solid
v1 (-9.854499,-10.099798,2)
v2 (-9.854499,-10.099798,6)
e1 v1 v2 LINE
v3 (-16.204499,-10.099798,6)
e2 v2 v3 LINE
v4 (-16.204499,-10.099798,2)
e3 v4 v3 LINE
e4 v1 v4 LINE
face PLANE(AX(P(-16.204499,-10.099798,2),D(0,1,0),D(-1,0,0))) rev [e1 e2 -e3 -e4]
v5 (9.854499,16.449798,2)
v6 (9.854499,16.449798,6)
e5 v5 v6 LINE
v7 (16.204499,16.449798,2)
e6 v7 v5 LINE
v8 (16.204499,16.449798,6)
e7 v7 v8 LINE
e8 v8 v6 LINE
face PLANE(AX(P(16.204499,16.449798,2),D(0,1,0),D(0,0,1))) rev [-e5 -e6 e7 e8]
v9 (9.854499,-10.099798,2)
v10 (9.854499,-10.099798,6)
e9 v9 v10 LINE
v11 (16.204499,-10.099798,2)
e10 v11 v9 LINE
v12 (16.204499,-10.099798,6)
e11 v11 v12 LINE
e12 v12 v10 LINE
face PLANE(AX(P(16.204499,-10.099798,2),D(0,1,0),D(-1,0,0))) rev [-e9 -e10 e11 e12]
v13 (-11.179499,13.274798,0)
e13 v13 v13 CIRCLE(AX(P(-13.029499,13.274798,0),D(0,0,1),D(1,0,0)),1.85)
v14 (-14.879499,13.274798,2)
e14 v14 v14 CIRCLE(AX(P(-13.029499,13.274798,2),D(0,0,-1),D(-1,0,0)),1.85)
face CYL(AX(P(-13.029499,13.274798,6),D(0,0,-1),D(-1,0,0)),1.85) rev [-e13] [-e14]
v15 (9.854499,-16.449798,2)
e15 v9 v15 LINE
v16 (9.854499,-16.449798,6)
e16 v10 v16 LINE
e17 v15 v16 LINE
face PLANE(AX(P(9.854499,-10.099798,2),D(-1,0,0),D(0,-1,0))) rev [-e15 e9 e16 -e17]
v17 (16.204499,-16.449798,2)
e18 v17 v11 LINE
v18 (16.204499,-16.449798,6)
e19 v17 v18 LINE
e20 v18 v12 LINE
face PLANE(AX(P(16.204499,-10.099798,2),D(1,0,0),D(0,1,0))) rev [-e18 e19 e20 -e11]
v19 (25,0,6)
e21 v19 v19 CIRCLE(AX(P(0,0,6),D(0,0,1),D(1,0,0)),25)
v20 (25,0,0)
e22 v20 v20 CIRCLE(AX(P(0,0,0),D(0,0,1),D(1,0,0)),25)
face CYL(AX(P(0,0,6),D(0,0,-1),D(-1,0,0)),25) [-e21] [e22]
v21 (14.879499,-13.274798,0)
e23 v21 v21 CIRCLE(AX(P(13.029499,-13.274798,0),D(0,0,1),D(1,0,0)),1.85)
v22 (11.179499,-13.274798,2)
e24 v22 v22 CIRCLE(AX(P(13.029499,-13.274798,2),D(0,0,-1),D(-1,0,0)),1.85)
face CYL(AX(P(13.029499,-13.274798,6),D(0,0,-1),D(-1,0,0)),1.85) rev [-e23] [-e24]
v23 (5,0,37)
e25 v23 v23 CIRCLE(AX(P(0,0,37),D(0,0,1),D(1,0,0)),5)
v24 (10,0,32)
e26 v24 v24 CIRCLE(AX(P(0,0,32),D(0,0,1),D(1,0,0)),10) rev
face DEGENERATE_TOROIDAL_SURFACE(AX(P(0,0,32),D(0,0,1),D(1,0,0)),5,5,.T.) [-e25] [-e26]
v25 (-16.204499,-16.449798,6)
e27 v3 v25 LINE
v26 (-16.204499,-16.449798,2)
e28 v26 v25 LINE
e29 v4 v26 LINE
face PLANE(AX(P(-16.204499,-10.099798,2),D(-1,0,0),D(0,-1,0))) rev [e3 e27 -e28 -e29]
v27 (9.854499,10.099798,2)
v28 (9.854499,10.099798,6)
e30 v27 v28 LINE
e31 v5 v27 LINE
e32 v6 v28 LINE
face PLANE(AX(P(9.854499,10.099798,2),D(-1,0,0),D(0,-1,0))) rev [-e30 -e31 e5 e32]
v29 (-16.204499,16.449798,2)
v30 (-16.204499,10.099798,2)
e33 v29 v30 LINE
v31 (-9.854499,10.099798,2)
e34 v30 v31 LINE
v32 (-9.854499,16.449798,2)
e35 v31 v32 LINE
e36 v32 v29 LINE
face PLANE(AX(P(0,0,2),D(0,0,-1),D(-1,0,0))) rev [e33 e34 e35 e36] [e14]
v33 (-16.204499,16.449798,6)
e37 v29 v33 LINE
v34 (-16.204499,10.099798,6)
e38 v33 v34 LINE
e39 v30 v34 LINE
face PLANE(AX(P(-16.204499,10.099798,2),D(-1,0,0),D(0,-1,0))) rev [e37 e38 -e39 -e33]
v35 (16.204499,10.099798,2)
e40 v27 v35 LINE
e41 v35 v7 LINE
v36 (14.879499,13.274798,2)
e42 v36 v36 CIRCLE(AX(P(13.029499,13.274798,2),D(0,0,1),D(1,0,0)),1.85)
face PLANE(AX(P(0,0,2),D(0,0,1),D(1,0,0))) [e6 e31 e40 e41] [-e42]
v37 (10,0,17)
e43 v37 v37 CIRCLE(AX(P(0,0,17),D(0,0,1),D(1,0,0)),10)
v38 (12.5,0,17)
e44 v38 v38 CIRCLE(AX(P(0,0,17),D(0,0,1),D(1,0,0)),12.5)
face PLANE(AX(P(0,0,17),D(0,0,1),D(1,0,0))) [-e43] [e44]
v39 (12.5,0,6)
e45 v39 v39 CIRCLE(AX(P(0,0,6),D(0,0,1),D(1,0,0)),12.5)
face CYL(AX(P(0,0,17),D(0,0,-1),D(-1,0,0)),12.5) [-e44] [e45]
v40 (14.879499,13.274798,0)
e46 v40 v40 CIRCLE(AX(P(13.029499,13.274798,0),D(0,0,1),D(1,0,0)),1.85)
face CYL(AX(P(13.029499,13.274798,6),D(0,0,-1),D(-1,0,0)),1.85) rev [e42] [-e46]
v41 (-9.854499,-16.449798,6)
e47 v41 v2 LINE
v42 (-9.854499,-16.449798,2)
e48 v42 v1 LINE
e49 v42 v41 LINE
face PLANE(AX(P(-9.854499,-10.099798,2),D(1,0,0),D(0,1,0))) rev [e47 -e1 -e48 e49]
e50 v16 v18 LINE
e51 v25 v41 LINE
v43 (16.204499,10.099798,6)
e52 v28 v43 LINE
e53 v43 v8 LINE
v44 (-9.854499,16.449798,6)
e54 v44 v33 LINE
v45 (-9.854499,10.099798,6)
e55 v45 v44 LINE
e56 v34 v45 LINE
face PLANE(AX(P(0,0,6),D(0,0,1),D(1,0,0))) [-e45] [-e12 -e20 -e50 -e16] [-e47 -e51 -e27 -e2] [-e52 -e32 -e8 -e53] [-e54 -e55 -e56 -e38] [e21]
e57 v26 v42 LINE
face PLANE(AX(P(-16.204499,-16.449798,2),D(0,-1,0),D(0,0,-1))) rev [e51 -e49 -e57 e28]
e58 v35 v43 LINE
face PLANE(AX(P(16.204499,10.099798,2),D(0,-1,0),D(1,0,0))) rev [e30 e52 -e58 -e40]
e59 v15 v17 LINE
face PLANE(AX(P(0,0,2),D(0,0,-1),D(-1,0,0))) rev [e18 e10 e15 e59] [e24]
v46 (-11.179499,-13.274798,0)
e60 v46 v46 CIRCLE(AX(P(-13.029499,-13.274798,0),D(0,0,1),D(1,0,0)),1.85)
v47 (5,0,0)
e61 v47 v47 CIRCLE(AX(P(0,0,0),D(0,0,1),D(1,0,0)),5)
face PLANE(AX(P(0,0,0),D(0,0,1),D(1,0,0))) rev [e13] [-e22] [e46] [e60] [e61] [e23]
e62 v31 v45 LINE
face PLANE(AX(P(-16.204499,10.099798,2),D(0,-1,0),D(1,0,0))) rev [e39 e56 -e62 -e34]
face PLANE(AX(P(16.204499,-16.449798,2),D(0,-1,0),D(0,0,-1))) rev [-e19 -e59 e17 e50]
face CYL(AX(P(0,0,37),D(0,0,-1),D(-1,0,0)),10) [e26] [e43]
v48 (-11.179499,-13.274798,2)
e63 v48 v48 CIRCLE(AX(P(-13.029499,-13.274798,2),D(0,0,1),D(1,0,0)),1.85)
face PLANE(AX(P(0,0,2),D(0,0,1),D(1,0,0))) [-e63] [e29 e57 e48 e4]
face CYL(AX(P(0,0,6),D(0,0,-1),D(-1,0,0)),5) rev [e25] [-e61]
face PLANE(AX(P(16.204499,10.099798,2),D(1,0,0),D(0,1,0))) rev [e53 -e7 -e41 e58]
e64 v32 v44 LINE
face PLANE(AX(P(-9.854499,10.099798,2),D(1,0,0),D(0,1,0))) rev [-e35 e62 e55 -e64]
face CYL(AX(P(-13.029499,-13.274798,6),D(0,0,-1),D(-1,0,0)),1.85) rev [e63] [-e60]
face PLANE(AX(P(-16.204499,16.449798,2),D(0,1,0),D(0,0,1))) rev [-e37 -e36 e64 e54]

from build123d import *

# Parameters (mm, degrees)
SKETCH1_R           = 25
SKETCH1_R_2         = 1.85
SKETCH1_R_3         = 5
BOSS_EXTRUDE1_DEPTH = 6
SKETCH2_R           = 12.5
SKETCH2_R_2         = 5
BOSS_EXTRUDE2_DEPTH = 11
SKETCH3_R           = 10
SKETCH3_R_2         = 5
BOSS_EXTRUDE3_DEPTH = 20
FILLET1_R           = 5
SKETCH4_W           = 6.35
SKETCH4_H           = 6.35
CUT_EXTRUDE1_DEPTH  = 4


with BuildPart() as part:
    # Sketch1 → Boss-Extrude1 (new body)
    with BuildSketch(Plane.XY):
        Circle(SKETCH1_R)
        with Locations((-13.029498672, -13.274798425)):
            Circle(SKETCH1_R_2, mode=Mode.SUBTRACT)
        with Locations((13.029498672, -13.274798425)):
            Circle(SKETCH1_R_2, mode=Mode.SUBTRACT)
        with Locations((13.029498672, 13.274798425)):
            Circle(SKETCH1_R_2, mode=Mode.SUBTRACT)
        with Locations((-13.029498672, 13.274798425)):
            Circle(SKETCH1_R_2, mode=Mode.SUBTRACT)
        Circle(SKETCH1_R_3, mode=Mode.SUBTRACT)
    extrude(amount=BOSS_EXTRUDE1_DEPTH)

    # Sketch2 → Boss-Extrude2 (add)
    with BuildSketch(Plane.XY.offset(6)):
        Circle(SKETCH2_R)
        Circle(SKETCH2_R_2, mode=Mode.SUBTRACT)
    extrude(amount=BOSS_EXTRUDE2_DEPTH)

    # Sketch3 → Boss-Extrude3 (add)
    with BuildSketch(Plane.XY.offset(17)):
        Circle(SKETCH3_R)
        Circle(SKETCH3_R_2, mode=Mode.SUBTRACT)
    extrude(amount=BOSS_EXTRUDE3_DEPTH)

    # Fillet1
    fillet1_edges = [part.edges().sort_by_distance(p)[0] for p in [
        (-10, 0, 37),
    ]]
    fillet(fillet1_edges, radius=FILLET1_R - 0.0001)  # a hair under: the kernel refuses the full size

    # Sketch4 → Cut-Extrude1 (cut)
    with BuildSketch(Plane.XY.offset(6)):
        with Locations((13.029498672, -13.274798425)):
            Rectangle(SKETCH4_W, SKETCH4_H)
        with Locations((13.029498672, 13.274798425)):
            Rectangle(SKETCH4_W, SKETCH4_H)
        with Locations((-13.029498672, 13.274798425)):
            Rectangle(SKETCH4_W, SKETCH4_H)
        with Locations((-13.029498672, -13.274798425)):
            Rectangle(SKETCH4_W, SKETCH4_H)
    extrude(amount=-CUT_EXTRUDE1_DEPTH, mode=Mode.SUBTRACT)


solid = part.part
